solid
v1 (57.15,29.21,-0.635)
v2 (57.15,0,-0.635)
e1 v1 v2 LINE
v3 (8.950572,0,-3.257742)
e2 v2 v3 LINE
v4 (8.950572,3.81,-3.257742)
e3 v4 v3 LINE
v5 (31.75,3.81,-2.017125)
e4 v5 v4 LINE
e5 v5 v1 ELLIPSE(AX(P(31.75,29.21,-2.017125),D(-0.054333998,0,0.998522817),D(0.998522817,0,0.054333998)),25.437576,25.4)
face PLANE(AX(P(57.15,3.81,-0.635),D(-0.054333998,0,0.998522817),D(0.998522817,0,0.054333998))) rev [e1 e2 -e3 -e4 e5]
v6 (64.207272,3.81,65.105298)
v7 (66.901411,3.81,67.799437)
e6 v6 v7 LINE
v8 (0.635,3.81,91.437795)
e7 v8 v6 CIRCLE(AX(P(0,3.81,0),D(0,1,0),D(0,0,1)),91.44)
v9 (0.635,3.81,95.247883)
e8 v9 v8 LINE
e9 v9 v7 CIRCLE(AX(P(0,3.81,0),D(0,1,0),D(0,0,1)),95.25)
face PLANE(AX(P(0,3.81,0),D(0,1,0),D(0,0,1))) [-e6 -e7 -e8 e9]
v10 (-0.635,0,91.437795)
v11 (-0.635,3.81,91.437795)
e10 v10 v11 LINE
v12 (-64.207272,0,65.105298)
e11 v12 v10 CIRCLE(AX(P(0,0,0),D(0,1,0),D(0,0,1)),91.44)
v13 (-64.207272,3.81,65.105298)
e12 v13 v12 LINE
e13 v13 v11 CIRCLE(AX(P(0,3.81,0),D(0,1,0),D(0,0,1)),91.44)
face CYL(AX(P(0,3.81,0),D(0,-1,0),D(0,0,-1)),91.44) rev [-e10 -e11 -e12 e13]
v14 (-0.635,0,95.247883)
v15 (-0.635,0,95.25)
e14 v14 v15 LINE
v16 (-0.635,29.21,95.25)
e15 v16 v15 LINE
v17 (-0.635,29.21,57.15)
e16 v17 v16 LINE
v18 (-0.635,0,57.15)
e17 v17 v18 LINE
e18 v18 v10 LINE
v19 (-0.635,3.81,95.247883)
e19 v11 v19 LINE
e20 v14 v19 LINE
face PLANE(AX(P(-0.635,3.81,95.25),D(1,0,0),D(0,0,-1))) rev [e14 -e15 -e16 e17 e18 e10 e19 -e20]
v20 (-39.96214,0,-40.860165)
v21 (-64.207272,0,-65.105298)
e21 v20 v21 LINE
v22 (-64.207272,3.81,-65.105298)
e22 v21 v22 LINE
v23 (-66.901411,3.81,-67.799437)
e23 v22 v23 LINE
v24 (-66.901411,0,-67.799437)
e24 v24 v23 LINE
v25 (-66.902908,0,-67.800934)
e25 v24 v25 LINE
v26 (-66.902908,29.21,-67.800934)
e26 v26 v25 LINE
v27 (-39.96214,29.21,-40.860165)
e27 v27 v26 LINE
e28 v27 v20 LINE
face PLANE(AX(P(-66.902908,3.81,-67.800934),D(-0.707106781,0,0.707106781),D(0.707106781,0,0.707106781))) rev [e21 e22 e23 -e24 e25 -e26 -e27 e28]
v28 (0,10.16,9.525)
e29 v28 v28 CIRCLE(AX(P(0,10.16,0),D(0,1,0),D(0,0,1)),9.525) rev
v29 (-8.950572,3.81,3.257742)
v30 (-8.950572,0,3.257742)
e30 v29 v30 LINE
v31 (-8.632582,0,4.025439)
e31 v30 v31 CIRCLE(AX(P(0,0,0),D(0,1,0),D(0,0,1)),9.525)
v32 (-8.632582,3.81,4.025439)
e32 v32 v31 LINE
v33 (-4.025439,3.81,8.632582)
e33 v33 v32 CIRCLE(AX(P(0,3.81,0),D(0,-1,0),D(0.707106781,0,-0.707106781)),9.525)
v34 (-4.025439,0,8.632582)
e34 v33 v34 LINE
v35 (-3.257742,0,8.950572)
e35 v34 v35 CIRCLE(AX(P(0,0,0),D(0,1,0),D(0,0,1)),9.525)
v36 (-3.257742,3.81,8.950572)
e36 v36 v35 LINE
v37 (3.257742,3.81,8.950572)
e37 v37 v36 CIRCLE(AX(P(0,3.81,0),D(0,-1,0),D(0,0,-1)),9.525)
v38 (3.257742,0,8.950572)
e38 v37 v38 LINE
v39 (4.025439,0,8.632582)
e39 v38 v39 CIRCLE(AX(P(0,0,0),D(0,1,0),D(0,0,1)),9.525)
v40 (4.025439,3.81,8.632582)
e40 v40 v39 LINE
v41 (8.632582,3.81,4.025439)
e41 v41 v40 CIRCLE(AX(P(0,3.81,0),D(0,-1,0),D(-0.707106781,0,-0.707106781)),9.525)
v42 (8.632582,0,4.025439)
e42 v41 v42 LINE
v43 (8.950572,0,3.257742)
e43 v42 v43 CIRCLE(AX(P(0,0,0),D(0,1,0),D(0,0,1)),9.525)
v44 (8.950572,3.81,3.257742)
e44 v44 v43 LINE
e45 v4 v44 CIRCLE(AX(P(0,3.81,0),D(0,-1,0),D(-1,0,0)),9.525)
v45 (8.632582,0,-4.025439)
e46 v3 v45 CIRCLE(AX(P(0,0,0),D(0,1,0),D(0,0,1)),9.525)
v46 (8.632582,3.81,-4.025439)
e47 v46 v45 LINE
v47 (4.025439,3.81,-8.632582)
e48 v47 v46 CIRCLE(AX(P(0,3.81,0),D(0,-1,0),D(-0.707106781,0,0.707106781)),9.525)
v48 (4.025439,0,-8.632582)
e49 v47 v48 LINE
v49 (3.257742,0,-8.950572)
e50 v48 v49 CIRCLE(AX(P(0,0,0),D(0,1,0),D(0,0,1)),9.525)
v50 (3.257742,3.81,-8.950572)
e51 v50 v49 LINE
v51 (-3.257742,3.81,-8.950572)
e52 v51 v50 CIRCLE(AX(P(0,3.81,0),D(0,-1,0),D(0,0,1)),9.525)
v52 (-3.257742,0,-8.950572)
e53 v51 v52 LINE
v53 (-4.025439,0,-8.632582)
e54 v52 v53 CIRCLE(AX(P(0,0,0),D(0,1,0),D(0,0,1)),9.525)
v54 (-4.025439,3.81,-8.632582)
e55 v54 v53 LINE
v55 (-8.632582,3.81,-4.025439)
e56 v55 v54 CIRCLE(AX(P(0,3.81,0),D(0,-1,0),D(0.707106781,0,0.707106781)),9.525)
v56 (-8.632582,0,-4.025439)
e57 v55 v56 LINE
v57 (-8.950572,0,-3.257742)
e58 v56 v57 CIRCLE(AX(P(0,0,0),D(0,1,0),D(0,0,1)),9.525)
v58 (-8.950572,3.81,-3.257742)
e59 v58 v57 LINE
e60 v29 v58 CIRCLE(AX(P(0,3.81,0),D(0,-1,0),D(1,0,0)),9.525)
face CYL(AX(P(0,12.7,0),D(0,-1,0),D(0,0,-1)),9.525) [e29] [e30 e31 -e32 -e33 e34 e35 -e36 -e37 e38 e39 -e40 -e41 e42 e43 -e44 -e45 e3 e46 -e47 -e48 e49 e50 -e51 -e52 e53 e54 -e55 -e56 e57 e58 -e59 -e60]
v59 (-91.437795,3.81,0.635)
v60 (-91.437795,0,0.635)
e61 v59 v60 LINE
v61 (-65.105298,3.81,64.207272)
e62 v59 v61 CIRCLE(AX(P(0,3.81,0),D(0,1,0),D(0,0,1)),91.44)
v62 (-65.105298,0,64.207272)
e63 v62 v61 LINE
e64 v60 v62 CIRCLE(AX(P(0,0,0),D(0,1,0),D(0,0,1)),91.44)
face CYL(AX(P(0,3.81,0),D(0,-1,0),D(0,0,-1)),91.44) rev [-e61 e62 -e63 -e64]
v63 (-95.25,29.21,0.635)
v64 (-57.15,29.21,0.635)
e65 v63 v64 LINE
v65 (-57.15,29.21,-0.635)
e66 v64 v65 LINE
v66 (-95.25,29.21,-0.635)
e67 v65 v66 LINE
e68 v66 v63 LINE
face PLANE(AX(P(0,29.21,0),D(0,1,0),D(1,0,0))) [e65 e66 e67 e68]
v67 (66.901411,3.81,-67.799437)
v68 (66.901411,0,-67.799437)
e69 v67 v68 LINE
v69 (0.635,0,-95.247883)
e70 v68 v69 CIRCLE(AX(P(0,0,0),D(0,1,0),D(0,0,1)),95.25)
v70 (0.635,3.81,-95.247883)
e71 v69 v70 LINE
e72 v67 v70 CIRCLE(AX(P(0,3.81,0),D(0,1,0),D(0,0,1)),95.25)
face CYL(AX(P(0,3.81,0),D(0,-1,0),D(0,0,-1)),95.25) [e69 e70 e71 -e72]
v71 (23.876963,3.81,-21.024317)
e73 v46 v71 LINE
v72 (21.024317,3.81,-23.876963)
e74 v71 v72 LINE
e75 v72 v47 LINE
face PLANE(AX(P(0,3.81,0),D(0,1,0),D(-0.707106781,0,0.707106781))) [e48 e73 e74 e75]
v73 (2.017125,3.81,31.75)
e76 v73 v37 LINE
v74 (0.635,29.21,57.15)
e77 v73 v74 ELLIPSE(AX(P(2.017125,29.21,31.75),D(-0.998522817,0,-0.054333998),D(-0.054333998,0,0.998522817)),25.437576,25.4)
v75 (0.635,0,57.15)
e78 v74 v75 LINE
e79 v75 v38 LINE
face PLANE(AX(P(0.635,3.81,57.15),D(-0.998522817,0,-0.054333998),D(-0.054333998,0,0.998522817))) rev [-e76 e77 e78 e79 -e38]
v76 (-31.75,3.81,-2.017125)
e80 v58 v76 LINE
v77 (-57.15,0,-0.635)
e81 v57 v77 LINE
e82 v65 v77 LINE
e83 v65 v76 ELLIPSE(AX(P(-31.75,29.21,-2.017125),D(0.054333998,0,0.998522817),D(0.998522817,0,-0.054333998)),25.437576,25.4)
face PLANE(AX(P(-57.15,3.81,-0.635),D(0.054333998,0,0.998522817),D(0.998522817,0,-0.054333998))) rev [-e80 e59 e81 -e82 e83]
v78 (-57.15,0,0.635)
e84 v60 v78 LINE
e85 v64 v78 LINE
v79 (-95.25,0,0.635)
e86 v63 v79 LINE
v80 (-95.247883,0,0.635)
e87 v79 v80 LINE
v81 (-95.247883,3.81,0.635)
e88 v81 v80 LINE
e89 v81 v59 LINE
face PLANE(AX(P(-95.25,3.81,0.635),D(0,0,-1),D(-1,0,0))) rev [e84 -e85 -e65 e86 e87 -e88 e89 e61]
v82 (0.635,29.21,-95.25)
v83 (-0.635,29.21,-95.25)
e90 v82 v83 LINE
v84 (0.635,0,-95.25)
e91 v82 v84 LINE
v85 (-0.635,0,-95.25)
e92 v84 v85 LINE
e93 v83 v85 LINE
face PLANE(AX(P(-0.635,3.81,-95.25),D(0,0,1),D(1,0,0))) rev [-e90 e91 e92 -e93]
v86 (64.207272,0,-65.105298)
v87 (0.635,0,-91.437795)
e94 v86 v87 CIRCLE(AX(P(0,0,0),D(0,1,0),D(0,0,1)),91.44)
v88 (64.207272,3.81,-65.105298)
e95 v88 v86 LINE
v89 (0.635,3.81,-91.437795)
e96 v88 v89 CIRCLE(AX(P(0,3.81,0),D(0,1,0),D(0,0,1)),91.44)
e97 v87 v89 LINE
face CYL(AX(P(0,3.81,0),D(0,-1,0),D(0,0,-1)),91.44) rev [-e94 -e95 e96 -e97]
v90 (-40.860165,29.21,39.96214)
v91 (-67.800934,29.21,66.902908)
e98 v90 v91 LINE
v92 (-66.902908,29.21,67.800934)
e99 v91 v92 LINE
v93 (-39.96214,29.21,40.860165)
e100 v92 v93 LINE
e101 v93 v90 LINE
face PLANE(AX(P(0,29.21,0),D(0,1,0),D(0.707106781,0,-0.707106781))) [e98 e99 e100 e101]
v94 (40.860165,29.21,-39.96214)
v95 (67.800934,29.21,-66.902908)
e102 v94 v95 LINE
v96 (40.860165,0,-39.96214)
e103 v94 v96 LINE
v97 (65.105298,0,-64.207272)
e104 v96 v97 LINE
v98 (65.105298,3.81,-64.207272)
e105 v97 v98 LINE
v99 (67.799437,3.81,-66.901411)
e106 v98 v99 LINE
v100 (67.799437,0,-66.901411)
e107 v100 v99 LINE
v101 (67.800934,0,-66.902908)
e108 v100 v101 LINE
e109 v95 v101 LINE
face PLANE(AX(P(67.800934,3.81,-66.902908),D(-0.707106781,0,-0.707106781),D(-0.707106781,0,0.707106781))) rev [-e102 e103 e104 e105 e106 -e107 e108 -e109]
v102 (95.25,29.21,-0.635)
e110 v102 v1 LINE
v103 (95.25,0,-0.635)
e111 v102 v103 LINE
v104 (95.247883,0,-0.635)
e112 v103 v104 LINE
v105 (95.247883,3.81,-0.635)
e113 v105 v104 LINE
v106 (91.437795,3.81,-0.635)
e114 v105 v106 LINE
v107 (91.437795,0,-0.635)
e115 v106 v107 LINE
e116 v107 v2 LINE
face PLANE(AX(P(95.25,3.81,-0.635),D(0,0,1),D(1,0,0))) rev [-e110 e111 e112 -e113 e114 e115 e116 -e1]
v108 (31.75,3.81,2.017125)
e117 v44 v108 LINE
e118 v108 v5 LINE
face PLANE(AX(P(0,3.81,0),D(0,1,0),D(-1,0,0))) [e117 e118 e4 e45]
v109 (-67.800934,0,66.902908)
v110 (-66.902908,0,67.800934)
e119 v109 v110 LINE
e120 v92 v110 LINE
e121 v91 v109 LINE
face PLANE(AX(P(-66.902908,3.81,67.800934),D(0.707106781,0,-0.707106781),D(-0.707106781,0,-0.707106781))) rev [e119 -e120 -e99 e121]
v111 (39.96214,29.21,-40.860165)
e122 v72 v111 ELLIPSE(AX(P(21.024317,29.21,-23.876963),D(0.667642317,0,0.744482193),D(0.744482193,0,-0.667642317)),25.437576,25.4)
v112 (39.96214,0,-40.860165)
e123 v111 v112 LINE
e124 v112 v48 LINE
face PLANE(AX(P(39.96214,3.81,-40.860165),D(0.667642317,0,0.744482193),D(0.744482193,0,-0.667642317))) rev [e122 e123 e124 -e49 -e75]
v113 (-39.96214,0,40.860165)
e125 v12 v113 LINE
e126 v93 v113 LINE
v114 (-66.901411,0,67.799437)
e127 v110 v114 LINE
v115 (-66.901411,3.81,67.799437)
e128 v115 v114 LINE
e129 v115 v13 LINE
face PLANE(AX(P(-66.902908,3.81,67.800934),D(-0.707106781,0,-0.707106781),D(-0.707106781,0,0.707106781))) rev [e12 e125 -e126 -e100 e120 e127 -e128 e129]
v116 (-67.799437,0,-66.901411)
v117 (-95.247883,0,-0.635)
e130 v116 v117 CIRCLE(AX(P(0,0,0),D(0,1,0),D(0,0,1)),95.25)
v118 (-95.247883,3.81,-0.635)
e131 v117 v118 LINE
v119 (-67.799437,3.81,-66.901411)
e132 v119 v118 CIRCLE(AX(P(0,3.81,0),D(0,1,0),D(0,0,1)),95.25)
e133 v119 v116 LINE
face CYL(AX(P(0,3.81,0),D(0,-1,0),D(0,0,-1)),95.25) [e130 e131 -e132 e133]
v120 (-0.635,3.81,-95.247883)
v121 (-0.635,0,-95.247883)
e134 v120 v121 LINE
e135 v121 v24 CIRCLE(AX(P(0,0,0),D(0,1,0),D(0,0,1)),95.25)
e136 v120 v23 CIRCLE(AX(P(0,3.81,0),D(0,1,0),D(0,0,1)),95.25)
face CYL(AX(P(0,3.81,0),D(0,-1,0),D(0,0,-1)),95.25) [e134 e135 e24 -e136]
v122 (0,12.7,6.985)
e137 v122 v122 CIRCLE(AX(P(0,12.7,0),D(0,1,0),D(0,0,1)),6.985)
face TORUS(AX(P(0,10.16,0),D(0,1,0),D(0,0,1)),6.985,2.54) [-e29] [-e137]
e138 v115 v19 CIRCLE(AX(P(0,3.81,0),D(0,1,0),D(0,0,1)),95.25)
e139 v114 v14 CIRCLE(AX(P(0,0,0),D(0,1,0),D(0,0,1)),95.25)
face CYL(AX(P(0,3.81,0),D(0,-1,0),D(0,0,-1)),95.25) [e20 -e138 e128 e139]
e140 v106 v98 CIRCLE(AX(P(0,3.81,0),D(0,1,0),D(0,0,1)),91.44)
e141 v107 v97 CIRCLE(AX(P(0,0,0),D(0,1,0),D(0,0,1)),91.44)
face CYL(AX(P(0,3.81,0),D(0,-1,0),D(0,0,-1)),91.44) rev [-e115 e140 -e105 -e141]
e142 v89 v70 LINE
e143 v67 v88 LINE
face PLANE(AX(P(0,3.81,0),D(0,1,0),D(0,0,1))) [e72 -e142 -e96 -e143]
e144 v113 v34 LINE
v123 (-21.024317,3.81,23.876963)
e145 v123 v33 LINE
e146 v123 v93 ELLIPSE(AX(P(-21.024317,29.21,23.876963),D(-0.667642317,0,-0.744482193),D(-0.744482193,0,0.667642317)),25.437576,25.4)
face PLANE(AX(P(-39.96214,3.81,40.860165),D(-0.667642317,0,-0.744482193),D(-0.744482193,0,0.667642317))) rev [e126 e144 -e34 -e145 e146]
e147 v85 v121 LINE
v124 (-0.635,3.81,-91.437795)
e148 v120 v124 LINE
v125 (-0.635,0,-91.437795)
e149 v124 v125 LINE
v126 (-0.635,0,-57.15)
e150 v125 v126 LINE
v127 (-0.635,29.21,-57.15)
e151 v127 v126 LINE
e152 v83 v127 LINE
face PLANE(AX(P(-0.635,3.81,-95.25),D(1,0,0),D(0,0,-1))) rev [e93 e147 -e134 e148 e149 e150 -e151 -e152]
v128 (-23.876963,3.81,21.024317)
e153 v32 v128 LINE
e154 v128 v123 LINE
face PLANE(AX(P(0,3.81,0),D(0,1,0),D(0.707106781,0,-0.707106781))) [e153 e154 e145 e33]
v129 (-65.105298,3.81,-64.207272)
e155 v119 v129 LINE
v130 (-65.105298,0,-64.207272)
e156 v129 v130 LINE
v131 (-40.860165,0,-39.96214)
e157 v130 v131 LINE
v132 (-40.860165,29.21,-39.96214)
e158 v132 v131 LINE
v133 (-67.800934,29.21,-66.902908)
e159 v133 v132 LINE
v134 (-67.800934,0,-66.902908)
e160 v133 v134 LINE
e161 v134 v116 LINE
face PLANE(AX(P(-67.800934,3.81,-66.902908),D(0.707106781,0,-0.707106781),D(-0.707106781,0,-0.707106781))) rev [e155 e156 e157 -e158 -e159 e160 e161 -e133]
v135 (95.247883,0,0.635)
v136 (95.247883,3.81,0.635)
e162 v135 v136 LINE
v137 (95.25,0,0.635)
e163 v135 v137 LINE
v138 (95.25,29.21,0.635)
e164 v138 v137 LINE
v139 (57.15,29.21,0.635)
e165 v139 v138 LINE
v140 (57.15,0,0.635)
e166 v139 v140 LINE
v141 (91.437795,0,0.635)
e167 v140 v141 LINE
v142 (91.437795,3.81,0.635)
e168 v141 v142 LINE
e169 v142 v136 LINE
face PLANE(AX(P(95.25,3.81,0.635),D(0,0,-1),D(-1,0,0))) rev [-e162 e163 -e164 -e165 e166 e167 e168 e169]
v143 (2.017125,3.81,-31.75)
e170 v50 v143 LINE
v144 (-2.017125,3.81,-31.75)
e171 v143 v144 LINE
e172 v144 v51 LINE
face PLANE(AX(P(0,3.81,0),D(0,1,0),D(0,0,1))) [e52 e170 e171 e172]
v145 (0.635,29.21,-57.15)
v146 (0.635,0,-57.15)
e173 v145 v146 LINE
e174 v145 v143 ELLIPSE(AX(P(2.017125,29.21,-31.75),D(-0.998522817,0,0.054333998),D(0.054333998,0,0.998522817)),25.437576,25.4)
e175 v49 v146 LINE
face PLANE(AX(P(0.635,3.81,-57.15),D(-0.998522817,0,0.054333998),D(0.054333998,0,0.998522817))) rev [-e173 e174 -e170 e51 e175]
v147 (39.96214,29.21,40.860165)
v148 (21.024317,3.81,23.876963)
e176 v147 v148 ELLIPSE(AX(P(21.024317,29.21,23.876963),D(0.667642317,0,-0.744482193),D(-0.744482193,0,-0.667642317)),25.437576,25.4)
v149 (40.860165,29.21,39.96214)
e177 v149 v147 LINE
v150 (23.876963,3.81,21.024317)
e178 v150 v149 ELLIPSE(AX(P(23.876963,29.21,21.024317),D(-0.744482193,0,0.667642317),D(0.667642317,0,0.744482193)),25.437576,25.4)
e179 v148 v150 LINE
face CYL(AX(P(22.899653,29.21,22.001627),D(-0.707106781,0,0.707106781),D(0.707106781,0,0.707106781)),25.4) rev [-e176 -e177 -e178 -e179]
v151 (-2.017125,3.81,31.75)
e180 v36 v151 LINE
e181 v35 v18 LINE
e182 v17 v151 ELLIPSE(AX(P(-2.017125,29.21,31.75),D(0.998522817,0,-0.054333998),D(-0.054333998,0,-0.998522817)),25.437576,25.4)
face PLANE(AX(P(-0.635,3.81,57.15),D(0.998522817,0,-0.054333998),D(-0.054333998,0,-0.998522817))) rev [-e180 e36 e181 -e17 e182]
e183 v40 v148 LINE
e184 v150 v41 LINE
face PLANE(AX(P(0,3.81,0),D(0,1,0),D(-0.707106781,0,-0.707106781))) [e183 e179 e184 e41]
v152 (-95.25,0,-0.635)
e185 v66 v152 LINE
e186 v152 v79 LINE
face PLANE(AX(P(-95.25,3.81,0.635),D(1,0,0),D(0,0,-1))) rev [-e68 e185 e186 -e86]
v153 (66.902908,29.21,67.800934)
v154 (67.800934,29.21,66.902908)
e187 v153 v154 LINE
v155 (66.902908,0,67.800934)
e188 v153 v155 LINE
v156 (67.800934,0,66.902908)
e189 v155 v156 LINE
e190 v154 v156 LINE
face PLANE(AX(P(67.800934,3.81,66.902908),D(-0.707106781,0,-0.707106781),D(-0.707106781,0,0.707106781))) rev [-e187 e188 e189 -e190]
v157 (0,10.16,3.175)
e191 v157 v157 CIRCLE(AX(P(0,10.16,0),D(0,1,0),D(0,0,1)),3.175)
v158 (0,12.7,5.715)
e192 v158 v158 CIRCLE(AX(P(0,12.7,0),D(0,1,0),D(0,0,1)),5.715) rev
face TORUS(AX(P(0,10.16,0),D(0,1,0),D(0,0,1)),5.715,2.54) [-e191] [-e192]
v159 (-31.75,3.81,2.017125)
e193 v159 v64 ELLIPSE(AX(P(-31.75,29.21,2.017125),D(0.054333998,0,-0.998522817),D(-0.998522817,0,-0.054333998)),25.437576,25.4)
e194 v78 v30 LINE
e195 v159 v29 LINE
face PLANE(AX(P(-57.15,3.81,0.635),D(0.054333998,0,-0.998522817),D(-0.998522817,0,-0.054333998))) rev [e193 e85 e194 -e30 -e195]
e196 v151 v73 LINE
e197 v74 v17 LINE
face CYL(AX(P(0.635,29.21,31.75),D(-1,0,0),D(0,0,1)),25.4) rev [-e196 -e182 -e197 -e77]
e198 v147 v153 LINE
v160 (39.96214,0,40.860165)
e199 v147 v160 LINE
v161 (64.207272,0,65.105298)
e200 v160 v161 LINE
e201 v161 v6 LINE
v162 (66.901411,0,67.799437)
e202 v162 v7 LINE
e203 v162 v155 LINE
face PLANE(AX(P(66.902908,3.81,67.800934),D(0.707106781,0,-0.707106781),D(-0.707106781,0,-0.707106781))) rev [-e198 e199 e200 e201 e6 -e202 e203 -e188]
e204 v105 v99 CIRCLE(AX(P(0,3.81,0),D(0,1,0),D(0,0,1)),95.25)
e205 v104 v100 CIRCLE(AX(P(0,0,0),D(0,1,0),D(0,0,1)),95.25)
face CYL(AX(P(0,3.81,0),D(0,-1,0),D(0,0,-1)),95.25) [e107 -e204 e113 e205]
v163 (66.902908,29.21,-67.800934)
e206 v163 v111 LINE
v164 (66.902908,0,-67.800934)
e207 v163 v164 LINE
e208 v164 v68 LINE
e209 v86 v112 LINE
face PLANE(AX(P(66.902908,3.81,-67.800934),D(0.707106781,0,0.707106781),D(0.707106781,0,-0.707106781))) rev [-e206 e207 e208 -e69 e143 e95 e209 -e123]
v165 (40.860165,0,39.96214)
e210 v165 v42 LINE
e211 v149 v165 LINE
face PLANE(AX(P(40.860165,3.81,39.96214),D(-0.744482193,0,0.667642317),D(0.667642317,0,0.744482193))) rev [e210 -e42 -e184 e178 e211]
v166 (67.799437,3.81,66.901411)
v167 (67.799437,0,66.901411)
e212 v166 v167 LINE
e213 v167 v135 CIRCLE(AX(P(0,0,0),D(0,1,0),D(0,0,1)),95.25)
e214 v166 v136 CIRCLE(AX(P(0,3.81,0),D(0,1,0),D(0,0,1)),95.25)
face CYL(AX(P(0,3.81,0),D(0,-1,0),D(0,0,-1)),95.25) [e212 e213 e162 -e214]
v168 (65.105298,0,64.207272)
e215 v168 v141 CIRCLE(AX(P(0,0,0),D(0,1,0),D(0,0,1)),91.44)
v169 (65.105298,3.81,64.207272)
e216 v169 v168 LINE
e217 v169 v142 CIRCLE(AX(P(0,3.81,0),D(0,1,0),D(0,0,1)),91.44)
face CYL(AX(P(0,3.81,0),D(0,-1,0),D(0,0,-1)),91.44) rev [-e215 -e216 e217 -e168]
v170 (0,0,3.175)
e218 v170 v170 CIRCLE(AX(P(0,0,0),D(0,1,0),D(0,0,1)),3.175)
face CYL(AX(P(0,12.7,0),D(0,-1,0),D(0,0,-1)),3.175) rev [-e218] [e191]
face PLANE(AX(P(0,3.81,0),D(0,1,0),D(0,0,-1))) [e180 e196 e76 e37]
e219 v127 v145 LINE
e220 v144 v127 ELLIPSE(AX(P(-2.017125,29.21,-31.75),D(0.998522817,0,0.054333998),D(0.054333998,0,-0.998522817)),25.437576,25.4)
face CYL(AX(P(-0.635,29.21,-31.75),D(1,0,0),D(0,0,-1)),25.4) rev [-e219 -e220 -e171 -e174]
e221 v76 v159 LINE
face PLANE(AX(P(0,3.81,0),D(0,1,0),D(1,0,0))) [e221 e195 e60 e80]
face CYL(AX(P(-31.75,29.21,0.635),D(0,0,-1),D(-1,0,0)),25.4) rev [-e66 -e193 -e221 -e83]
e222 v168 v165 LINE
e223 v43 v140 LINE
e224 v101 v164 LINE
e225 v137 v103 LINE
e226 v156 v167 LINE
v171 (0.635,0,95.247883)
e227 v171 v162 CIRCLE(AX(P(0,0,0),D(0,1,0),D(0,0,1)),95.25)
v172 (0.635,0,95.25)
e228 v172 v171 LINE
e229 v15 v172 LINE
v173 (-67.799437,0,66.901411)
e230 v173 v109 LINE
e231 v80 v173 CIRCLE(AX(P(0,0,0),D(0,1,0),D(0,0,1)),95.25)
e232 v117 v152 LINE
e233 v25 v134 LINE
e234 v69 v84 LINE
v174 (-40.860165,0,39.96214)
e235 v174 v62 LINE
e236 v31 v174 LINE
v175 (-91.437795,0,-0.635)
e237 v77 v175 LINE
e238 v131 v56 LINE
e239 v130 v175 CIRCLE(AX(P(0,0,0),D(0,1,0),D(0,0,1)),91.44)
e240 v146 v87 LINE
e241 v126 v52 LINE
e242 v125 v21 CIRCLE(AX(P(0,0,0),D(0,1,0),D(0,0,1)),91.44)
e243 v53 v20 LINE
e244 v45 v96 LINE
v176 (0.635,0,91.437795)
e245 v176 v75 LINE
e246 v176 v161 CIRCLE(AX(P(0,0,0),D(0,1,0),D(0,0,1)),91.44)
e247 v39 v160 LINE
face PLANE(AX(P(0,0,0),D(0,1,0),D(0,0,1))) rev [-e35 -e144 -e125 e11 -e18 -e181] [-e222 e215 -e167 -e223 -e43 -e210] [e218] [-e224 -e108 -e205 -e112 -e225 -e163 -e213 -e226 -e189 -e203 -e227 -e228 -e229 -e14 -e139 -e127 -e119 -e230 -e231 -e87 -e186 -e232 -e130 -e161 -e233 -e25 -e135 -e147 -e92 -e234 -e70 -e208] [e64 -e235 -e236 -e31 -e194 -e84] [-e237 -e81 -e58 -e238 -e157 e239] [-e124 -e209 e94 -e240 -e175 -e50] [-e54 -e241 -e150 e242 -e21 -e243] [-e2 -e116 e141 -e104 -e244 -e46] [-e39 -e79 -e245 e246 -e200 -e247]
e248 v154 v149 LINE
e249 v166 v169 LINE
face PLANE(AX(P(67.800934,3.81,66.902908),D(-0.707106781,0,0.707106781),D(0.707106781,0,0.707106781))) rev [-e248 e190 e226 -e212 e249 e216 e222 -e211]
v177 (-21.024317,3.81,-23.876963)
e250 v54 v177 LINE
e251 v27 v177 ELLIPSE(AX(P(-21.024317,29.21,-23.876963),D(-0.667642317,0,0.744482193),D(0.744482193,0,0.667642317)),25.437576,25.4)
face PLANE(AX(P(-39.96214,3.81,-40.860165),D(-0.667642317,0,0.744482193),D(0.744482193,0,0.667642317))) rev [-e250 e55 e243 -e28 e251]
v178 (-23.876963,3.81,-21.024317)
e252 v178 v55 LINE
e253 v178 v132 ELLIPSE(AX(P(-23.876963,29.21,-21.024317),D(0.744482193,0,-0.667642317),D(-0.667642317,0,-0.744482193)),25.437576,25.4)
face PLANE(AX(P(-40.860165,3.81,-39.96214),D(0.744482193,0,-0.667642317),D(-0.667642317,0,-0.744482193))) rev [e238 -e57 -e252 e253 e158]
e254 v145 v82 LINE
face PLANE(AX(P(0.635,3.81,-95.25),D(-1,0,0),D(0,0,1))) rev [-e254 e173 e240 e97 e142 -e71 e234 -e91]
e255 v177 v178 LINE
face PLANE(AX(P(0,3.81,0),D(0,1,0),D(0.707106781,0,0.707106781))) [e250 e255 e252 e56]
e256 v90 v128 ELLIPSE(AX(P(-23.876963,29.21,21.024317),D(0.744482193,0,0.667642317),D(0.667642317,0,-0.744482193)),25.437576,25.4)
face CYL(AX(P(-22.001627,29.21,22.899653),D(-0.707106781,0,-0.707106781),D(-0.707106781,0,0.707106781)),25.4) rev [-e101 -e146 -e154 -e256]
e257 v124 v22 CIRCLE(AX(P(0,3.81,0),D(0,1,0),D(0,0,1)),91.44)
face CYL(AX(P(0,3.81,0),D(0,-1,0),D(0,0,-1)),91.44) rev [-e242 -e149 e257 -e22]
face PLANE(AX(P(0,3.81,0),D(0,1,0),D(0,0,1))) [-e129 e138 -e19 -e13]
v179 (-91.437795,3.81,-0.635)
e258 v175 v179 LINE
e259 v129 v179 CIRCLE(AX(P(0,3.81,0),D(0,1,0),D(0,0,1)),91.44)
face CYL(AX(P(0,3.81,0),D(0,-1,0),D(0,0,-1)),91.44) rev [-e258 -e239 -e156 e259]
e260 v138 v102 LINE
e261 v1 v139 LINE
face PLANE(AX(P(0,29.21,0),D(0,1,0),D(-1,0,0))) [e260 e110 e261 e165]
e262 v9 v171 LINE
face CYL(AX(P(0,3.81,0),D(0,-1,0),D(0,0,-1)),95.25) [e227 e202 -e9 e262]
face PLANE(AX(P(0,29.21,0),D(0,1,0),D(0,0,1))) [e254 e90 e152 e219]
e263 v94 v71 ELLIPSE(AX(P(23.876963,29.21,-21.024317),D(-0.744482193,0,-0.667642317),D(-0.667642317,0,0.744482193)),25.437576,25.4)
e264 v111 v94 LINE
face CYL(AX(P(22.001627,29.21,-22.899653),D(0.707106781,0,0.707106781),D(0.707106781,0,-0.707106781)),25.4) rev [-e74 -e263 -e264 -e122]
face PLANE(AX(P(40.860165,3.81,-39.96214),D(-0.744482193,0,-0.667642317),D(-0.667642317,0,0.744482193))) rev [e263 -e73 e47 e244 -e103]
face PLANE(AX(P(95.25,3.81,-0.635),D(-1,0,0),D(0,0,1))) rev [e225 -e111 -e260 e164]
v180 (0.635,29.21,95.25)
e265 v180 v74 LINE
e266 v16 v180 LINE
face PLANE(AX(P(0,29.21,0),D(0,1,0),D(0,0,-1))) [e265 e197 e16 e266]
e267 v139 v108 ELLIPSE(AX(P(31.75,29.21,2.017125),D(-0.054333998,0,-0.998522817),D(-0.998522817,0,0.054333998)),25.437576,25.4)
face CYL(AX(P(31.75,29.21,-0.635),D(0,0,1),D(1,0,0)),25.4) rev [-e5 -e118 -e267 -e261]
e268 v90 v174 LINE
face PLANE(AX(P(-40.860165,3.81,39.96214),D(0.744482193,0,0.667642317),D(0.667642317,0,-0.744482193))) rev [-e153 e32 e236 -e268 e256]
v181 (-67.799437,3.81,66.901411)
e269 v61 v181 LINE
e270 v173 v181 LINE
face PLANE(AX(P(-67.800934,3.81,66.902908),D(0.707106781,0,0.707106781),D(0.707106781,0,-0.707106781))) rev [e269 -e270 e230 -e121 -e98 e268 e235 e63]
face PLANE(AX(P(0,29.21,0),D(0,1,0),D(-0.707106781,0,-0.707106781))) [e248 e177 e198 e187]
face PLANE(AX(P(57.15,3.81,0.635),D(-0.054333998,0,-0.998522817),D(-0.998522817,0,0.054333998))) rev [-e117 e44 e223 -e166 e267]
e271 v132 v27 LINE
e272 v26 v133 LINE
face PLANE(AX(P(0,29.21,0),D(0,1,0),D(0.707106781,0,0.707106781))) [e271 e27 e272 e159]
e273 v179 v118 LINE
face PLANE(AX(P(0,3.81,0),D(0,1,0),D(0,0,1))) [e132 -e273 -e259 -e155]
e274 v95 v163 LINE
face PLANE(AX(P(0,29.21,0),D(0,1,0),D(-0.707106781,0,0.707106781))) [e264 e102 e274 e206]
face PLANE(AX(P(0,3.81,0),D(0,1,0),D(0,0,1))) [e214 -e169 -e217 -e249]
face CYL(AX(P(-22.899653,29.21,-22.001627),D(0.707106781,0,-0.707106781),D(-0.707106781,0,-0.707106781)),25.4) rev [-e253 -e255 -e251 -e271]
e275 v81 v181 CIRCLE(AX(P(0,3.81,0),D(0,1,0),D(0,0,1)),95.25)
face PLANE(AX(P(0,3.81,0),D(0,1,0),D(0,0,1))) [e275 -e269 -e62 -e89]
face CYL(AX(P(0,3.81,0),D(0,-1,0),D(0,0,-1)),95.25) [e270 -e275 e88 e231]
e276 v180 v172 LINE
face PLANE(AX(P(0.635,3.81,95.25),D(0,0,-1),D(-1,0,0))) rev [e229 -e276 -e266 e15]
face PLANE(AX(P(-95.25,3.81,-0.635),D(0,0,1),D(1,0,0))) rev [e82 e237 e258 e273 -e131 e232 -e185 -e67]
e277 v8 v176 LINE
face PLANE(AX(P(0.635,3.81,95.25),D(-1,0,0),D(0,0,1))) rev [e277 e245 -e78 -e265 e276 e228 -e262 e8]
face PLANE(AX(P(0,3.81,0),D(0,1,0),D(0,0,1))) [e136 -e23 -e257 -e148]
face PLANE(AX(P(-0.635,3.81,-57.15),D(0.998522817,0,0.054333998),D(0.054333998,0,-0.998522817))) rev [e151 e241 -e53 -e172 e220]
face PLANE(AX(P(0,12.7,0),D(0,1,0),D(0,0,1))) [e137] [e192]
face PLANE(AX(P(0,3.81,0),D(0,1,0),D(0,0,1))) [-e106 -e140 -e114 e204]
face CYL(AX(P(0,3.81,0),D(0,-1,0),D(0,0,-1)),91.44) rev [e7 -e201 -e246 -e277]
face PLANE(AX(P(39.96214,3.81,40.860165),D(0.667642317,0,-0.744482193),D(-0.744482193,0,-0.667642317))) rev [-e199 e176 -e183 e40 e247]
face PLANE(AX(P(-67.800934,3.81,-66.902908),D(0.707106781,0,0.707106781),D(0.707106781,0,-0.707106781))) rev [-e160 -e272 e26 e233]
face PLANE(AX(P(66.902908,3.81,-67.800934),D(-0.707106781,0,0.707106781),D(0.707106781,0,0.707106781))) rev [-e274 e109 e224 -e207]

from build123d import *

# Parameters (mm, degrees)
BOSS_EXTRUDE1_DEPTH      = 3.81
SKETCH2_W                = 1.27
SKETCH2_H                = 38.1
BOSS_EXTRUDE2_DEPTH      = 25.4
FILLET1_R                = 25.4
SKETCH4_R                = 9.525
SKETCH4_R_2              = 3.175
BOSS_EXTRUDE3_DEPTH      = 12.7
CIRPATTERN5_COUNT        = 8
FILLET1_OF_CIRPATTERN5_R = 25.4
SKETCH5_R                = 95.25
SKETCH5_R_2              = 91.44
BOSS_EXTRUDE4_DEPTH      = 3.81
FILLET2_R                = 2.54


with BuildPart() as part:
    # Sketch1 → Boss-Extrude1 (new body)
    with BuildSketch(Plane(origin=(0, 0, 0), x_dir=(1, 0, 0), z_dir=(0, 1, 0))):
        with BuildLine():
            Line((-0.635, 57.15), (-3.257741865, 8.950572213))
            ThreePointArc((-3.257741865, 8.950572213), (0, 9.525), (3.257741865, 8.950572213))
            Line((3.257741865, 8.950572213), (0.635, 57.15))
            Line((0.635, 57.15), (0.635, 95.25))
            Line((0.635, 95.25), (-0.635, 95.25))
            Line((-0.635, 95.25), (-0.635, 57.15))
        make_face()
    boss_extrude1 = extrude(amount=BOSS_EXTRUDE1_DEPTH)

    # Sketch2 → Boss-Extrude2 (add)
    with BuildSketch(Plane(origin=(0, 3.81, 0), x_dir=(1, 0, 0), z_dir=(0, 1, 0))):
        with Locations((0, 76.2)):
            Rectangle(SKETCH2_W, SKETCH2_H)
    boss_extrude2 = extrude(amount=BOSS_EXTRUDE2_DEPTH)

    # Fillet1
    fillet1_edges = [part.edges().sort_by_distance(p)[0] for p in [
        (0, 3.81, -57.15),
    ]]
    fillet(fillet1_edges, radius=FILLET1_R - 0.0001)  # a hair under: the kernel refuses the full size

    # Sketch4 → Boss-Extrude3 (add)
    with BuildSketch(Plane(origin=(0, 0, 0), x_dir=(1, 0, 0), z_dir=(0, 1, 0))):
        with Locations(Location((0, 0, 0), (0, 0, 70))):
            Circle(SKETCH4_R)
        with Locations(Location((0, 0, 0), (0, 0, 270))):
            Circle(SKETCH4_R_2, mode=Mode.SUBTRACT)
    extrude(amount=BOSS_EXTRUDE3_DEPTH)

    # CirPattern5: Boss-Extrude1, Boss-Extrude2 ×8 about axis
    cirpattern5_axis = Axis((0, 0, 0), (0, 1, 0))
    add([boss_extrude1.rotate(cirpattern5_axis, i * 360 / CIRPATTERN5_COUNT) for i in range(1, CIRPATTERN5_COUNT)])
    add([boss_extrude2.rotate(cirpattern5_axis, i * 360 / CIRPATTERN5_COUNT) for i in range(1, CIRPATTERN5_COUNT)])

    # Fillet1 of CirPattern5
    fillet1_of_cirpattern5_edges = [part.edges().sort_by_distance(p)[0] for p in [
        (-40.411152545, 3.81, -40.411152545),
        (-57.15, 3.81, 0),
        (-40.411152545, 3.81, 40.411152545),
        (0, 3.81, 57.15),
        (40.411152545, 3.81, 40.411152545),
        (57.15, 3.81, 0),
        (40.411152545, 3.81, -40.411152545),
    ]]
    fillet(fillet1_of_cirpattern5_edges, radius=FILLET1_OF_CIRPATTERN5_R - 0.0001)  # a hair under: the kernel refuses the full size

    # Sketch5 → Boss-Extrude4 (add)
    with BuildSketch(Plane(origin=(0, 0, 0), x_dir=(1, 0, 0), z_dir=(0, 1, 0))):
        Circle(SKETCH5_R)
        Circle(SKETCH5_R_2, mode=Mode.SUBTRACT)
    extrude(amount=BOSS_EXTRUDE4_DEPTH)

    # Fillet2
    fillet2_edges = [part.edges().sort_by_distance(p)[0] for p in [
        (-3.257741865, 12.7, 8.950572213),
        (0, 12.7, -3.175),
    ]]
    fillet(fillet2_edges, radius=FILLET2_R)


solid = part.part
